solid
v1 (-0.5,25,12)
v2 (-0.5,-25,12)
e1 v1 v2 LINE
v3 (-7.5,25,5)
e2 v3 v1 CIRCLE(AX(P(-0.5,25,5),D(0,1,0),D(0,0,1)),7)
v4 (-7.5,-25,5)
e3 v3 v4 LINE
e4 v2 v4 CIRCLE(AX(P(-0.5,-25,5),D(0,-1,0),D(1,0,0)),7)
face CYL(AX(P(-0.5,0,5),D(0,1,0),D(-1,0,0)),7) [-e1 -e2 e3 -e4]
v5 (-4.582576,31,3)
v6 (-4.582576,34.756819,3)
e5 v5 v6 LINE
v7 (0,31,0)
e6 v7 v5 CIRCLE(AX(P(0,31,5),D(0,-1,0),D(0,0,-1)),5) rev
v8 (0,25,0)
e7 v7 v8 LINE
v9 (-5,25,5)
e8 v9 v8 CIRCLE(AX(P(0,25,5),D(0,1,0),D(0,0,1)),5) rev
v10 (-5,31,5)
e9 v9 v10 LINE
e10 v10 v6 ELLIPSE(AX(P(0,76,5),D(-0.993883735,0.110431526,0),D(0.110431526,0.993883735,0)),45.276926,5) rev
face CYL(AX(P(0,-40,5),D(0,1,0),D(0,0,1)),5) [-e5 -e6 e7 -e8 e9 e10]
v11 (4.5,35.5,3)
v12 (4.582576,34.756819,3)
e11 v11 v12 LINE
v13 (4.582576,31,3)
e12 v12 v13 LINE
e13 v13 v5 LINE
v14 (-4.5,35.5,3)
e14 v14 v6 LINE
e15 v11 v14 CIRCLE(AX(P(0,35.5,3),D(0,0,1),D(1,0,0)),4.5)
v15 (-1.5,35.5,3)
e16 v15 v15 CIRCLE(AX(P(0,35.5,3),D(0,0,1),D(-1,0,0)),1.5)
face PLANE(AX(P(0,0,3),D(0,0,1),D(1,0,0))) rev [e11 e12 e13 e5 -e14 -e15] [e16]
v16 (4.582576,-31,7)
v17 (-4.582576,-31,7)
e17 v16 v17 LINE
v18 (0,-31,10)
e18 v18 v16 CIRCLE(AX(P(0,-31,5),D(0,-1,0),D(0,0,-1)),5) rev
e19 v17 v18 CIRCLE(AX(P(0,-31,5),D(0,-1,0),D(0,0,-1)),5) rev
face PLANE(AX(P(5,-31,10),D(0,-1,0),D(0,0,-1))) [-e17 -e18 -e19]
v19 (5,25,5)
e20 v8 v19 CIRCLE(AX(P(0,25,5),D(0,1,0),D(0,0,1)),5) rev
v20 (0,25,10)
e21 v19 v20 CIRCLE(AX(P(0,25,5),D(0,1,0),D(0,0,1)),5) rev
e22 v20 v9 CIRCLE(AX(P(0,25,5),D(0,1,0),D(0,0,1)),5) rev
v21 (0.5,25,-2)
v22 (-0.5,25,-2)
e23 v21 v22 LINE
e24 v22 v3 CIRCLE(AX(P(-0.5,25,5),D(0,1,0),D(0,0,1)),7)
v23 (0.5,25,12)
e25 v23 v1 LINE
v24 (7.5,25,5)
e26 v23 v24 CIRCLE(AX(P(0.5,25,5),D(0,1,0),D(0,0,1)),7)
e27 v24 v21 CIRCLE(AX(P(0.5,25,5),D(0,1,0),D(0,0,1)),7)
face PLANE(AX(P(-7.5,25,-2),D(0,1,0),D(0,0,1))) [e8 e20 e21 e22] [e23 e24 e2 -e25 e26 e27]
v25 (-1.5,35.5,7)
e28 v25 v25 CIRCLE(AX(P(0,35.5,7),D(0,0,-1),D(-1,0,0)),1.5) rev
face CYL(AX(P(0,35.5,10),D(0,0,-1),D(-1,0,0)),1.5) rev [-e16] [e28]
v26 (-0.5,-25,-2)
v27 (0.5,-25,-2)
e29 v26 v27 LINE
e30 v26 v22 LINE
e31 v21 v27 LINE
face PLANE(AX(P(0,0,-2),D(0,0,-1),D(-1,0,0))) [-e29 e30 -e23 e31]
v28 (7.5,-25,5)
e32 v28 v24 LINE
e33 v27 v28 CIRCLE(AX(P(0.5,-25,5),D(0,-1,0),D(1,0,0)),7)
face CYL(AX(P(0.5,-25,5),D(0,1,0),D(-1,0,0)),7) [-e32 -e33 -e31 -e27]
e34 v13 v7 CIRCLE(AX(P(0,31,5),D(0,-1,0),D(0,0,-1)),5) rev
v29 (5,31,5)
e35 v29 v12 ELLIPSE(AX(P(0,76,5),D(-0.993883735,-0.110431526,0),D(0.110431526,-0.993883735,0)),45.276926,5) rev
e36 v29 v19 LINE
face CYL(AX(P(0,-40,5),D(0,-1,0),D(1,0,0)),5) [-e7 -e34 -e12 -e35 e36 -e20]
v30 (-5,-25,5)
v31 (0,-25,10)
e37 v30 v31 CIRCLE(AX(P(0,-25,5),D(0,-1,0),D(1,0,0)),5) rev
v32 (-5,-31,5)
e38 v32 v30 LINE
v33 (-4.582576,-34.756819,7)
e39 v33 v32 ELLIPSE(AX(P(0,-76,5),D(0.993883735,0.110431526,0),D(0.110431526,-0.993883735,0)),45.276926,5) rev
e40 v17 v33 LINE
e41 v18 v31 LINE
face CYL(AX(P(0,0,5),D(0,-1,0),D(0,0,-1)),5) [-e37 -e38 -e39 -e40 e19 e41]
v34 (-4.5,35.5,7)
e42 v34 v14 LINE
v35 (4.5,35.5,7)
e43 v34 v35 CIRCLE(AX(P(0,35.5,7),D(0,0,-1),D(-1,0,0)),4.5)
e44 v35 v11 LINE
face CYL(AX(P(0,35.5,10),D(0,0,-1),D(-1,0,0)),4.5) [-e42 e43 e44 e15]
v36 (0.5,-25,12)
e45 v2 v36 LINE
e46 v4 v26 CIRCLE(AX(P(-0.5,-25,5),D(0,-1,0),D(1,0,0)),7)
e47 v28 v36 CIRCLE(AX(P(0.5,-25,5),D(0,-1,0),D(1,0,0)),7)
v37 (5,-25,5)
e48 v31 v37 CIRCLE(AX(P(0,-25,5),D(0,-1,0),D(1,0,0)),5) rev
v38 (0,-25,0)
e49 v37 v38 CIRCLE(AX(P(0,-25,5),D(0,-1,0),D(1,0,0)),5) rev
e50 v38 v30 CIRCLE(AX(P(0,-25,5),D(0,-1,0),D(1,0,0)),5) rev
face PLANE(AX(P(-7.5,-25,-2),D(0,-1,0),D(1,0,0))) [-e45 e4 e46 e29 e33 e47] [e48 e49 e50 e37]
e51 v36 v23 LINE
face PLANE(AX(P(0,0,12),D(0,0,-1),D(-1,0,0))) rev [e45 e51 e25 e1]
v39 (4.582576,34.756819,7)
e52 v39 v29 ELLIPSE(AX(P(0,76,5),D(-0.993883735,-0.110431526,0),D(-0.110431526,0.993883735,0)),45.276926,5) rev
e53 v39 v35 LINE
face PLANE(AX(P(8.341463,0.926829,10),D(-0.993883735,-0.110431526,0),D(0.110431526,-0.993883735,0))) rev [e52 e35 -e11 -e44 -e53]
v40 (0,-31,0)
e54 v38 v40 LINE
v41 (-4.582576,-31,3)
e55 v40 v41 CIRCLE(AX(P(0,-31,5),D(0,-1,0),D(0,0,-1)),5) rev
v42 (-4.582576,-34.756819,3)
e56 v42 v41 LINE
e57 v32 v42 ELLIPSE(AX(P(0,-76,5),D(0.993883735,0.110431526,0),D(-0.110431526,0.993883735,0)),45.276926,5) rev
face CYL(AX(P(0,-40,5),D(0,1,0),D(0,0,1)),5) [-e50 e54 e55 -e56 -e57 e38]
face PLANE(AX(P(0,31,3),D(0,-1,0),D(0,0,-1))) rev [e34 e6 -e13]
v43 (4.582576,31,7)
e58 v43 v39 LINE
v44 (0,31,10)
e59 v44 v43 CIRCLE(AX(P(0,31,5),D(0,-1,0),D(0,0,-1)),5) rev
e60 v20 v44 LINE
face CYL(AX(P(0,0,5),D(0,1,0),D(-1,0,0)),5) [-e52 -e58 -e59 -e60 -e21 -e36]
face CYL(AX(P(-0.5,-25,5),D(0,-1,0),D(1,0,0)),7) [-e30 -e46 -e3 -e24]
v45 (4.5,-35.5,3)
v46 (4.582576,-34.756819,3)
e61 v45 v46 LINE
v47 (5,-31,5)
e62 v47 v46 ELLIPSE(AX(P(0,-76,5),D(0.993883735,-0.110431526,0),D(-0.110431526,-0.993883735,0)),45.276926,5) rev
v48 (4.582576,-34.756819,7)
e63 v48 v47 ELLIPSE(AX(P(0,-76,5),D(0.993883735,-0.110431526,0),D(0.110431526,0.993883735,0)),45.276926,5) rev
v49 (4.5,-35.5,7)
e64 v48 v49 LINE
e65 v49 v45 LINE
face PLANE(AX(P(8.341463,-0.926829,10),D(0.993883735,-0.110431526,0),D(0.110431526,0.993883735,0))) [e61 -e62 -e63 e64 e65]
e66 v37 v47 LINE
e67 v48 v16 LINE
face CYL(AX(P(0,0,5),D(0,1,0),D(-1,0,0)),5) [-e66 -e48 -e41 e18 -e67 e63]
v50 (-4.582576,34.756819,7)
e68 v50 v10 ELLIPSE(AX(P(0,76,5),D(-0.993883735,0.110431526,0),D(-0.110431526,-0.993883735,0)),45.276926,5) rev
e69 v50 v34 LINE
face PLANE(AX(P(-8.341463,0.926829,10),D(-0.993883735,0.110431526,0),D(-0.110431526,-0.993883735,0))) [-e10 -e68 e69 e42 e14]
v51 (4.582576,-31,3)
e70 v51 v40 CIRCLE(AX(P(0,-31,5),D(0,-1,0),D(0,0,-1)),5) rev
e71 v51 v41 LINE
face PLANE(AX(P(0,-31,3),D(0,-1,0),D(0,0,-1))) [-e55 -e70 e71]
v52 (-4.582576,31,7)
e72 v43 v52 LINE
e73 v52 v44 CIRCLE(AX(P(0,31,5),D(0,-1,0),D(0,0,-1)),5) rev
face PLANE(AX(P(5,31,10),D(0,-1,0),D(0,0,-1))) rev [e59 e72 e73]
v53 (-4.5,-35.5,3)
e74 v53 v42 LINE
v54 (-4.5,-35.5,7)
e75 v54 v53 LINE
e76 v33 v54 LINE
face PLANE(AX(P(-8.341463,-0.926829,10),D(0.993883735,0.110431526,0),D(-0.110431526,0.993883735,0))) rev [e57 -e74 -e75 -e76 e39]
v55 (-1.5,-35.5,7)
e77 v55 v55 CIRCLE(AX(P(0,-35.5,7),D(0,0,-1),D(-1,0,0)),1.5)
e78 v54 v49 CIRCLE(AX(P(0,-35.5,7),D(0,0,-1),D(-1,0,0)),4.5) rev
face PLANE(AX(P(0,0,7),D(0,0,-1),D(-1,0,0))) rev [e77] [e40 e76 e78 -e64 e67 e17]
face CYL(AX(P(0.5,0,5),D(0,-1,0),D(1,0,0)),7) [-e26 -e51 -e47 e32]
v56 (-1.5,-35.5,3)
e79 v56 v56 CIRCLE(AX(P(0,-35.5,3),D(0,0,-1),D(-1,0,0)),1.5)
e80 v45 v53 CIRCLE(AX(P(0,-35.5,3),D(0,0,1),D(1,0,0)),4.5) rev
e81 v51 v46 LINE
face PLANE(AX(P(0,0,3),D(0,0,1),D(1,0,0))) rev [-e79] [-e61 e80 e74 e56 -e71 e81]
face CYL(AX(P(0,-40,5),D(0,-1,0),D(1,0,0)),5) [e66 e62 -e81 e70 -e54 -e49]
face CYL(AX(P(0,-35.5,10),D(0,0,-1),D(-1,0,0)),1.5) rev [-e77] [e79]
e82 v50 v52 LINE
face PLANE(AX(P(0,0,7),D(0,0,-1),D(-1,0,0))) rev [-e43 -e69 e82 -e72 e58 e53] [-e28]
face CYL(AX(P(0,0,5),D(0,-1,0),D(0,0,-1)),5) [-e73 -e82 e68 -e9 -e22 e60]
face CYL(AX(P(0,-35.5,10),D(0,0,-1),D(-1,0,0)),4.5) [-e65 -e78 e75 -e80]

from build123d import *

# Parameters (mm, degrees)
SKETCH2_W                = 10
SKETCH2_H                = 80
BOSS_EXTRUDE1_DEPTH      = 10
FILLET1_R                = 5
CUT_EXTRUDE1_DEPTH       = 3
CUT_EXTRUDE2_START       = 7
SKETCH3_2_W              = 10
SKETCH3_2_H              = 9
CUT_EXTRUDE2_DEPTH       = 3
CUT_EXTRUDE4_START       = -4
CUT_EXTRUDE4_DEPTH       = 46.533119315
SKETCH7_R                = 1.5
CUT_EXTRUDE5_DEPTH       = 41.914545091
BOSS_EXTRUDE2_DEPTH      = 7
BOSS_EXTRUDE2_DEPTH_BACK = 7
SKETCH9_W                = 15
SKETCH9_H                = 50
FILLET3_R                = 7


with BuildPart() as part:
    # Sketch2 → Boss-Extrude1 (new body)
    with BuildSketch(Plane.XY):
        Rectangle(SKETCH2_W, SKETCH2_H)
    extrude(amount=BOSS_EXTRUDE1_DEPTH)

    # Fillet1
    fillet1_edges = [part.edges().sort_by_distance(p)[0] for p in [
        (-5, 0, 0),
        (5, 0, 0),
        (5, 0, 10),
        (-5, 0, 10),
    ]]
    fillet(fillet1_edges, radius=FILLET1_R - 0.0001)  # a hair under: the kernel refuses the full size

    # Sketch3 → Cut-Extrude1 (cut)
    with BuildSketch(Plane.XY):
        with BuildLine():
            Line((-5, -31), (-4.5, -35.5))
            ThreePointArc((-4.5, -35.5), (0, -40), (4.5, -35.5))
            Line((4.5, -35.5), (5, -31))
            Line((5, -31), (-5, -31))
        make_face()
        with BuildLine():
            Line((0, -40), (5, -40))
            Line((5, -40), (5, -31))
            Line((5, -31), (4.5, -35.5))
            ThreePointArc((4.5, -35.5), (3.181980515, -38.681980515), (0, -40))
        make_face()
        with BuildLine():
            Line((-5, -40), (0, -40))
            ThreePointArc((0, -40), (-3.181980515, -38.681980515), (-4.5, -35.5))
            Line((-4.5, -35.5), (-5, -31))
            Line((-5, -31), (-5, -40))
        make_face()
    cut_extrude1 = extrude(amount=CUT_EXTRUDE1_DEPTH, mode=Mode.SUBTRACT)

    # Sketch3<2> → Cut-Extrude2 (cut)
    with BuildSketch(Plane.XY.offset(CUT_EXTRUDE2_START)):
        with Locations((0, -35.5)):
            Rectangle(SKETCH3_2_W, SKETCH3_2_H)
    cut_extrude2 = extrude(amount=CUT_EXTRUDE2_DEPTH, mode=Mode.SUBTRACT)

    # Mirror1: Cut-Extrude1, Cut-Extrude2 across plane
    add(cut_extrude1.mirror(Plane.ZX), mode=Mode.SUBTRACT)
    add(cut_extrude2.mirror(Plane.ZX), mode=Mode.SUBTRACT)

    # Sketch3<4> → Cut-Extrude4 (cut)
    with BuildSketch(Plane.XY.offset(CUT_EXTRUDE4_START)):
        with BuildLine():
            Line((0, -40), (5, -40))
            Line((5, -40), (5, -31))
            Line((5, -31), (4.5, -35.5))
            ThreePointArc((4.5, -35.5), (3.181980515, -38.681980515), (0, -40))
        make_face()
        with BuildLine():
            Line((-5, -40), (0, -40))
            ThreePointArc((0, -40), (-3.181980515, -38.681980515), (-4.5, -35.5))
            Line((-4.5, -35.5), (-5, -31))
            Line((-5, -31), (-5, -40))
        make_face()
    cut_extrude4 = extrude(amount=CUT_EXTRUDE4_DEPTH, mode=Mode.SUBTRACT)

    # Sketch7 → Cut-Extrude5 (cut, through all)
    with BuildSketch(Plane(origin=(0, 0, 3), x_dir=(-1, 0, 0), z_dir=(0, 0, -1))):
        with Locations((0, -35.5)):
            Circle(SKETCH7_R)
    cut_extrude5 = extrude(amount=-CUT_EXTRUDE5_DEPTH, mode=Mode.SUBTRACT)

    # Mirror3: Cut-Extrude5 across plane
    add(cut_extrude5.mirror(Plane.ZX), mode=Mode.SUBTRACT)

    # Mirror4: Cut-Extrude4 across plane
    add(cut_extrude4.mirror(Plane.ZX), mode=Mode.SUBTRACT)

    # Sketch9 → Boss-Extrude2 (add, two sides: drawn at the far end of the back side and taken through both)
    with BuildSketch(Plane.XY.offset(5).offset(-BOSS_EXTRUDE2_DEPTH_BACK)):
        Rectangle(SKETCH9_W, SKETCH9_H)
    extrude(amount=BOSS_EXTRUDE2_DEPTH + BOSS_EXTRUDE2_DEPTH_BACK)

    # Fillet3
    fillet3_edges = [part.edges().sort_by_distance(p)[0] for p in [
        (-7.5, 0, 12),
        (7.5, 0, 12),
        (7.5, 0, -2),
        (-7.5, 0, -2),
    ]]
    fillet(fillet3_edges, radius=FILLET3_R - 0.0001)  # a hair under: the kernel refuses the full size


solid = part.part
